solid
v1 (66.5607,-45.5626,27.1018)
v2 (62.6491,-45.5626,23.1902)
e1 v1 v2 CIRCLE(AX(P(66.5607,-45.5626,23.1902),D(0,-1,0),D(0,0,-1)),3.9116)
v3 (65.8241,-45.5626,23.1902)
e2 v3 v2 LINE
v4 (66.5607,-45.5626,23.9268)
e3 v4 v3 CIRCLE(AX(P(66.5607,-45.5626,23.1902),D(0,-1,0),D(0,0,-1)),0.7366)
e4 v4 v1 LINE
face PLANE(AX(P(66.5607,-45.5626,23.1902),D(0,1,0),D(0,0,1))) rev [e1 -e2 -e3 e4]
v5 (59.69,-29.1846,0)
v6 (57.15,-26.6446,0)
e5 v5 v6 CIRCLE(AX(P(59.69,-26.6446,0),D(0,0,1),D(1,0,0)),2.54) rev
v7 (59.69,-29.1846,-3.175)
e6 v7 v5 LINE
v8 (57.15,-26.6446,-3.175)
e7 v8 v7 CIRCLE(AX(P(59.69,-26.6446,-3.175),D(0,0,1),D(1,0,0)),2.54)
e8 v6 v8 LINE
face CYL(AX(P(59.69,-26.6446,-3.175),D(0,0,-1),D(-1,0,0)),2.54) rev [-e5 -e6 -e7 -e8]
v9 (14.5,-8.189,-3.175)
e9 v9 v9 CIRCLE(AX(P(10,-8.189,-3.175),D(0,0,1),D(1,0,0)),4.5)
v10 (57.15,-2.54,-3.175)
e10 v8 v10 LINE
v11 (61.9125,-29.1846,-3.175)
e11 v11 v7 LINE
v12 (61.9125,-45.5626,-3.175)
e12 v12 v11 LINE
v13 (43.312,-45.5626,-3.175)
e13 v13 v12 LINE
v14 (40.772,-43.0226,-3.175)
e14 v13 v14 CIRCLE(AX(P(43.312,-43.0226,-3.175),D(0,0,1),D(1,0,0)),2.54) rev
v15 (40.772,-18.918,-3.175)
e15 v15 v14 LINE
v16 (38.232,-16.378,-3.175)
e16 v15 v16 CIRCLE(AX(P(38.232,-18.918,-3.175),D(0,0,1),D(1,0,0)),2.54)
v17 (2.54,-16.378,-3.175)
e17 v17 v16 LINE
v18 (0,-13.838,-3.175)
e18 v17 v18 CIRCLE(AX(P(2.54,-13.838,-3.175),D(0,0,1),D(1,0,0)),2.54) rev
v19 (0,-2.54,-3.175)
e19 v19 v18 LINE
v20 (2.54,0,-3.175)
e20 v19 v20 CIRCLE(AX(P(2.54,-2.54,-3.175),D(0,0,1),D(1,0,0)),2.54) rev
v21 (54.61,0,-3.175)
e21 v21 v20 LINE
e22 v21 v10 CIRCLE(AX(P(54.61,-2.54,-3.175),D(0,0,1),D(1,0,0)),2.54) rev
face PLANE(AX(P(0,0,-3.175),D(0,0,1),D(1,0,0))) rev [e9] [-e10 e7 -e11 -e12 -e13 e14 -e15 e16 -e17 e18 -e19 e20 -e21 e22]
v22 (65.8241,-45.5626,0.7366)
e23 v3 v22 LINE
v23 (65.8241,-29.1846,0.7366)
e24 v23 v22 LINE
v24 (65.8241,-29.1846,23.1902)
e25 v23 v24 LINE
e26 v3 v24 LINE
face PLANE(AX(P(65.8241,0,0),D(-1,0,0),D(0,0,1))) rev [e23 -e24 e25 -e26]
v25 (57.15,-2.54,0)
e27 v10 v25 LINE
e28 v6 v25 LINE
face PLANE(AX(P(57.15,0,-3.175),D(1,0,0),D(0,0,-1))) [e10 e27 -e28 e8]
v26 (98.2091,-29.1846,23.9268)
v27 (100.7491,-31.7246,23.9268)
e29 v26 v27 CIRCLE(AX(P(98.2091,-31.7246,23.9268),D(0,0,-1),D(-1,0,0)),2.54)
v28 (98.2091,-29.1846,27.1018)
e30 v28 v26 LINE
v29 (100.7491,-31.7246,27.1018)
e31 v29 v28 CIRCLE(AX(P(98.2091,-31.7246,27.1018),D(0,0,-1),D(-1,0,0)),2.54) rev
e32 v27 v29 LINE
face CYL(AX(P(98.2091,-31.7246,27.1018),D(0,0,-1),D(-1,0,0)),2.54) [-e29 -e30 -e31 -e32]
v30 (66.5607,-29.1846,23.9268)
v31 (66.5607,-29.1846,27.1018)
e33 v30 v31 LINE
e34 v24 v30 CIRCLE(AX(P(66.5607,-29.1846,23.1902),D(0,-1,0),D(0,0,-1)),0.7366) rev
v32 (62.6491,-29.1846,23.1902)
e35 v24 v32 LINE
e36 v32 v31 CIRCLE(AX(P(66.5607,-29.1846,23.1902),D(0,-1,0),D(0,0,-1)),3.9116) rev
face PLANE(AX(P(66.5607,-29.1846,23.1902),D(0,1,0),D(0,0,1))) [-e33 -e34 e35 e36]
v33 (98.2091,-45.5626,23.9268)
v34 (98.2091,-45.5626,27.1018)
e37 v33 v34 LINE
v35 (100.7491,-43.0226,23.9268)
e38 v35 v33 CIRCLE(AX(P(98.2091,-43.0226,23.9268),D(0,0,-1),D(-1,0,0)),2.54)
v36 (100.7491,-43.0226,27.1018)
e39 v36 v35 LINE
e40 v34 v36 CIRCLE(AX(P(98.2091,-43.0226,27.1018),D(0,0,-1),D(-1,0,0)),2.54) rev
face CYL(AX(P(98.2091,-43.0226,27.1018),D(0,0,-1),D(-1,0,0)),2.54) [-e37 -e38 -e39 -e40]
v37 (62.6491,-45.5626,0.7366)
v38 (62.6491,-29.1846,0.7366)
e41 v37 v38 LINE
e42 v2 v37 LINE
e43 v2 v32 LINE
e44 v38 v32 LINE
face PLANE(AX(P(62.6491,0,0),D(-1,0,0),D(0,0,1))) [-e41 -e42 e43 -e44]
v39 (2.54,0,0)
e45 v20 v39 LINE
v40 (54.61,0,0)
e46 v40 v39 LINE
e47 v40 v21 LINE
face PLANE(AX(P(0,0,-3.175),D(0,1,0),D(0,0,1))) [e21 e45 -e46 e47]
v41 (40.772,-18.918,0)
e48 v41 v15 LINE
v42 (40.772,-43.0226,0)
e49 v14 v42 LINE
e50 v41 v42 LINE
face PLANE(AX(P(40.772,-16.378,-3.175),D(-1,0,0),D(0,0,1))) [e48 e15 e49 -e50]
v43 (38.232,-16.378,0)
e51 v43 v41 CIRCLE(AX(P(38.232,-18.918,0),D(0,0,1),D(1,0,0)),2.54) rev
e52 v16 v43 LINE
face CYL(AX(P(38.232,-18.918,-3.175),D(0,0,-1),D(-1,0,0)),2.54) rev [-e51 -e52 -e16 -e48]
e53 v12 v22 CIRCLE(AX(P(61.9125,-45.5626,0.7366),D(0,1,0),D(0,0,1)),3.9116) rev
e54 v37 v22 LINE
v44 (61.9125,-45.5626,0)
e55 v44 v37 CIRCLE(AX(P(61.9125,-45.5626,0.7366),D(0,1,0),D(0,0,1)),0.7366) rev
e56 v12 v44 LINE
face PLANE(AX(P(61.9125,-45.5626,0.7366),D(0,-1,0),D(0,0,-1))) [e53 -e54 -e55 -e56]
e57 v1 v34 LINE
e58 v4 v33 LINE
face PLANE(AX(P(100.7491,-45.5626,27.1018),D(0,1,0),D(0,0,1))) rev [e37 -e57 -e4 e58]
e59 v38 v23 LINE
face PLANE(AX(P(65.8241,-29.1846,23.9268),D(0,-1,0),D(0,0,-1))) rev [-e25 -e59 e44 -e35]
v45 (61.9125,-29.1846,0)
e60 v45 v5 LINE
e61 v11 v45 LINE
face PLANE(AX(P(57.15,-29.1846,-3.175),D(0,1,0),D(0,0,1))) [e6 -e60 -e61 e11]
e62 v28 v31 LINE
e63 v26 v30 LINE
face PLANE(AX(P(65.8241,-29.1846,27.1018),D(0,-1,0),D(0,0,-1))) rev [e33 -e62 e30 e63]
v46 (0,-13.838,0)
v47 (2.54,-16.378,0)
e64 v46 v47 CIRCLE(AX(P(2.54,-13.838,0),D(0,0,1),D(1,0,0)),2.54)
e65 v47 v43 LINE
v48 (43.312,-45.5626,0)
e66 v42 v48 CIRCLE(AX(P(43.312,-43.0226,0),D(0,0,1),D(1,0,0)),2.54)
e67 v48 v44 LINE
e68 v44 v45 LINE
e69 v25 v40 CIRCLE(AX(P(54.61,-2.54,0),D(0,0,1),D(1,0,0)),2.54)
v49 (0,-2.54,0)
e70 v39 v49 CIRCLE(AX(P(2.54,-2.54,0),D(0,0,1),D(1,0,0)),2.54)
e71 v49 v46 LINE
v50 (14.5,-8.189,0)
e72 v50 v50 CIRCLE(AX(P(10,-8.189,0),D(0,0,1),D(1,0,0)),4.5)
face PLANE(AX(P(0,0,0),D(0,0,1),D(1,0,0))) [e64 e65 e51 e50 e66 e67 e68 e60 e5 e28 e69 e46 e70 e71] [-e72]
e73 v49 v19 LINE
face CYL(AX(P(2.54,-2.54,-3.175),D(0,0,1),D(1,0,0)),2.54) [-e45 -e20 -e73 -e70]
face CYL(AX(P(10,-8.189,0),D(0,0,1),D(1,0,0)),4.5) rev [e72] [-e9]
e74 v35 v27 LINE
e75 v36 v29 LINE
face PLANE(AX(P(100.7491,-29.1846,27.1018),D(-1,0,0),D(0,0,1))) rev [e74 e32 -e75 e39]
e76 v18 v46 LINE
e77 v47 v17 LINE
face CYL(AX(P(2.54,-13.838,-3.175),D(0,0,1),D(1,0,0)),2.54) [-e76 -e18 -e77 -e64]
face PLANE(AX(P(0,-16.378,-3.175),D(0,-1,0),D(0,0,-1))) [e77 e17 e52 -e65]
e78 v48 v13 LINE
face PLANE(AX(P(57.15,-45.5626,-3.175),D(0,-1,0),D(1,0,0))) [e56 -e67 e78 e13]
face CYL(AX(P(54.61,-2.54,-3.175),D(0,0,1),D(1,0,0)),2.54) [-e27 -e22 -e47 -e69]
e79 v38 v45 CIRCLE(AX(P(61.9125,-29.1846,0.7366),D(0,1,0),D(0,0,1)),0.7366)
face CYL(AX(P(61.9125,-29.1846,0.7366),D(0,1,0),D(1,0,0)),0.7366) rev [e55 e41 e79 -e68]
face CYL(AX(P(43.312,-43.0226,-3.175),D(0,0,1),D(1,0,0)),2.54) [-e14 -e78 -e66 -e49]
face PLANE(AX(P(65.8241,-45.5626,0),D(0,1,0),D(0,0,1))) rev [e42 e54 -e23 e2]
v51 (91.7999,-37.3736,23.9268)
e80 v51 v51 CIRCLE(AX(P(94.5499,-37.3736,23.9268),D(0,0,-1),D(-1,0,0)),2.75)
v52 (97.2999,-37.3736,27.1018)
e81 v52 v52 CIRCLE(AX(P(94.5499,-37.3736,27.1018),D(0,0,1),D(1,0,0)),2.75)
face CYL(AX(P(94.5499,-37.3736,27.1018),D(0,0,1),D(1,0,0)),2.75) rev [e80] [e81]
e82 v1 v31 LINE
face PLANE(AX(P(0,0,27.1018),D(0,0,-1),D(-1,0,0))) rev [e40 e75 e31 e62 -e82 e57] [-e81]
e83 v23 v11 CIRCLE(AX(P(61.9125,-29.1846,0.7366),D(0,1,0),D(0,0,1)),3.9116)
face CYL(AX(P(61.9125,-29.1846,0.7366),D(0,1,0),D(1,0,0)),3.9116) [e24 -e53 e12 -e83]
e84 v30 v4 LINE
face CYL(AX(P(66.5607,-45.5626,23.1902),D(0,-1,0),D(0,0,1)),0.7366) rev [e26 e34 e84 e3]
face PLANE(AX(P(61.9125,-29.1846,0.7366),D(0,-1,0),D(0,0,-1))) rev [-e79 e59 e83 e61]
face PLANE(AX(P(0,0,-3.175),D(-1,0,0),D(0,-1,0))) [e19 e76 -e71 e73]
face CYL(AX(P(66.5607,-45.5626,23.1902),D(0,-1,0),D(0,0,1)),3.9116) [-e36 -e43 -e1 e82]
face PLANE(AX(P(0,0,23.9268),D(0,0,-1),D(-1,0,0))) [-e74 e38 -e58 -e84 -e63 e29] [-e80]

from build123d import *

# Parameters (mm, degrees)
BASE_FLANGE1_DEPTH           = 3.175
M8_CLEARANCE_HOLE1_D         = 9
EDGE_FLANGE1_DEPTH           = 16.378
EDGE_FLANGE2_STRIP_W         = 14.1732
EDGE_FLANGE2_STRIP_H         = 3.175
EDGE_FLANGE2_STRIP_CUT_DEPTH = 16.378
EDGE_FLANGE2_DEPTH           = 16.378
M5_CLEARANCE_HOLE1_D         = 5.5
FILLET1_R                    = 2.54


# Sheet-metal steps are written as plain solids
with BuildPart() as part:
    # Sketch1 → Base-Flange1 (new body)
    with BuildSketch(Plane.XY):
        Polygon((0, 0), (57.15, 0), (57.15, -16.378), (57.15, -29.184600001), (61.9125, -29.184600001), (61.9125, -45.562600001), (57.15, -45.562600001), (40.772, -45.562600001), (40.772, -16.378), (0, -16.378), align=None)
    extrude(amount=-BASE_FLANGE1_DEPTH)

    # M8 Clearance Hole1 (through all)
    with Locations(Plane.XY):
        with Locations((10, -8.189)):
            Hole(M8_CLEARANCE_HOLE1_D / 2)

    # Edge-Flange1 section (across the edge) → Edge-Flange1 (add)
    with BuildSketch(Plane(origin=(62.6491, -45.562600001, 0), x_dir=(-1, 0, 0), z_dir=(0, 1, 0))):
        with BuildLine():
            Line((-3.175, 0.7366), (-3.175, 23.9268))
            Line((-3.175, 23.9268), (0, 23.9268))
            Line((0, 23.9268), (0, 0.7366))
            ThreePointArc((0, 0.7366), (0.215745145, 0.215745145), (0.7366, 0))
            Line((0.7366, 0), (0.7366, -3.175))
            ThreePointArc((0.7366, -3.175), (-2.029318885, -2.029318885), (-3.175, 0.7366))
        make_face()
    extrude(amount=EDGE_FLANGE1_DEPTH)

    # Edge-Flange2 strip (across the edge) → Edge-Flange2 strip cut (cut)
    with BuildSketch(Plane(origin=(65.8241, -29.184600001, 23.9268), x_dir=(0, 0, -1), z_dir=(0, -1, 0))):
        with Locations((-6.35, -1.5875)):
            Rectangle(EDGE_FLANGE2_STRIP_W, EDGE_FLANGE2_STRIP_H)
    extrude(amount=EDGE_FLANGE2_STRIP_CUT_DEPTH, mode=Mode.SUBTRACT)

    # Edge-Flange2 section (across the edge) → Edge-Flange2 (add)
    with BuildSketch(Plane(origin=(65.8241, -29.184600001, 23.9268), x_dir=(0, 0, -1), z_dir=(0, -1, 0))):
        with BuildLine():
            Line((-3.175, 0.7366), (-3.175, 34.925))
            Line((-3.175, 34.925), (0, 34.925))
            Line((0, 34.925), (0, 0.7366))
            ThreePointArc((0, 0.7366), (0.215745145, 0.215745145), (0.7366, 0))
            Line((0.7366, 0), (0.7366, -3.175))
            ThreePointArc((0.7366, -3.175), (-2.029318885, -2.029318885), (-3.175, 0.7366))
        make_face()
    extrude(amount=EDGE_FLANGE2_DEPTH)

    # M5 Clearance Hole1 (through all)
    with Locations(Plane.XY.offset(27.1018)):
        with Locations((94.5499, -37.373600001)):
            Hole(M5_CLEARANCE_HOLE1_D / 2)

    # Fillet1
    fillet1_edges = [part.edges().sort_by_distance(p)[0] for p in [
        (0, 0, -1.5875),
        (57.15, 0, -1.5875),
        (57.15, -29.184600001, -1.5875),
        (40.772, -45.562600001, -1.5875),
        (40.772, -16.378, -1.5875),
        (0, -16.378, -1.5875),
        (100.7491, -29.184600001, 25.5143),
        (100.7491, -45.562600001, 25.5143),
    ]]
    fillet(fillet1_edges, radius=FILLET1_R)


solid = part.part
